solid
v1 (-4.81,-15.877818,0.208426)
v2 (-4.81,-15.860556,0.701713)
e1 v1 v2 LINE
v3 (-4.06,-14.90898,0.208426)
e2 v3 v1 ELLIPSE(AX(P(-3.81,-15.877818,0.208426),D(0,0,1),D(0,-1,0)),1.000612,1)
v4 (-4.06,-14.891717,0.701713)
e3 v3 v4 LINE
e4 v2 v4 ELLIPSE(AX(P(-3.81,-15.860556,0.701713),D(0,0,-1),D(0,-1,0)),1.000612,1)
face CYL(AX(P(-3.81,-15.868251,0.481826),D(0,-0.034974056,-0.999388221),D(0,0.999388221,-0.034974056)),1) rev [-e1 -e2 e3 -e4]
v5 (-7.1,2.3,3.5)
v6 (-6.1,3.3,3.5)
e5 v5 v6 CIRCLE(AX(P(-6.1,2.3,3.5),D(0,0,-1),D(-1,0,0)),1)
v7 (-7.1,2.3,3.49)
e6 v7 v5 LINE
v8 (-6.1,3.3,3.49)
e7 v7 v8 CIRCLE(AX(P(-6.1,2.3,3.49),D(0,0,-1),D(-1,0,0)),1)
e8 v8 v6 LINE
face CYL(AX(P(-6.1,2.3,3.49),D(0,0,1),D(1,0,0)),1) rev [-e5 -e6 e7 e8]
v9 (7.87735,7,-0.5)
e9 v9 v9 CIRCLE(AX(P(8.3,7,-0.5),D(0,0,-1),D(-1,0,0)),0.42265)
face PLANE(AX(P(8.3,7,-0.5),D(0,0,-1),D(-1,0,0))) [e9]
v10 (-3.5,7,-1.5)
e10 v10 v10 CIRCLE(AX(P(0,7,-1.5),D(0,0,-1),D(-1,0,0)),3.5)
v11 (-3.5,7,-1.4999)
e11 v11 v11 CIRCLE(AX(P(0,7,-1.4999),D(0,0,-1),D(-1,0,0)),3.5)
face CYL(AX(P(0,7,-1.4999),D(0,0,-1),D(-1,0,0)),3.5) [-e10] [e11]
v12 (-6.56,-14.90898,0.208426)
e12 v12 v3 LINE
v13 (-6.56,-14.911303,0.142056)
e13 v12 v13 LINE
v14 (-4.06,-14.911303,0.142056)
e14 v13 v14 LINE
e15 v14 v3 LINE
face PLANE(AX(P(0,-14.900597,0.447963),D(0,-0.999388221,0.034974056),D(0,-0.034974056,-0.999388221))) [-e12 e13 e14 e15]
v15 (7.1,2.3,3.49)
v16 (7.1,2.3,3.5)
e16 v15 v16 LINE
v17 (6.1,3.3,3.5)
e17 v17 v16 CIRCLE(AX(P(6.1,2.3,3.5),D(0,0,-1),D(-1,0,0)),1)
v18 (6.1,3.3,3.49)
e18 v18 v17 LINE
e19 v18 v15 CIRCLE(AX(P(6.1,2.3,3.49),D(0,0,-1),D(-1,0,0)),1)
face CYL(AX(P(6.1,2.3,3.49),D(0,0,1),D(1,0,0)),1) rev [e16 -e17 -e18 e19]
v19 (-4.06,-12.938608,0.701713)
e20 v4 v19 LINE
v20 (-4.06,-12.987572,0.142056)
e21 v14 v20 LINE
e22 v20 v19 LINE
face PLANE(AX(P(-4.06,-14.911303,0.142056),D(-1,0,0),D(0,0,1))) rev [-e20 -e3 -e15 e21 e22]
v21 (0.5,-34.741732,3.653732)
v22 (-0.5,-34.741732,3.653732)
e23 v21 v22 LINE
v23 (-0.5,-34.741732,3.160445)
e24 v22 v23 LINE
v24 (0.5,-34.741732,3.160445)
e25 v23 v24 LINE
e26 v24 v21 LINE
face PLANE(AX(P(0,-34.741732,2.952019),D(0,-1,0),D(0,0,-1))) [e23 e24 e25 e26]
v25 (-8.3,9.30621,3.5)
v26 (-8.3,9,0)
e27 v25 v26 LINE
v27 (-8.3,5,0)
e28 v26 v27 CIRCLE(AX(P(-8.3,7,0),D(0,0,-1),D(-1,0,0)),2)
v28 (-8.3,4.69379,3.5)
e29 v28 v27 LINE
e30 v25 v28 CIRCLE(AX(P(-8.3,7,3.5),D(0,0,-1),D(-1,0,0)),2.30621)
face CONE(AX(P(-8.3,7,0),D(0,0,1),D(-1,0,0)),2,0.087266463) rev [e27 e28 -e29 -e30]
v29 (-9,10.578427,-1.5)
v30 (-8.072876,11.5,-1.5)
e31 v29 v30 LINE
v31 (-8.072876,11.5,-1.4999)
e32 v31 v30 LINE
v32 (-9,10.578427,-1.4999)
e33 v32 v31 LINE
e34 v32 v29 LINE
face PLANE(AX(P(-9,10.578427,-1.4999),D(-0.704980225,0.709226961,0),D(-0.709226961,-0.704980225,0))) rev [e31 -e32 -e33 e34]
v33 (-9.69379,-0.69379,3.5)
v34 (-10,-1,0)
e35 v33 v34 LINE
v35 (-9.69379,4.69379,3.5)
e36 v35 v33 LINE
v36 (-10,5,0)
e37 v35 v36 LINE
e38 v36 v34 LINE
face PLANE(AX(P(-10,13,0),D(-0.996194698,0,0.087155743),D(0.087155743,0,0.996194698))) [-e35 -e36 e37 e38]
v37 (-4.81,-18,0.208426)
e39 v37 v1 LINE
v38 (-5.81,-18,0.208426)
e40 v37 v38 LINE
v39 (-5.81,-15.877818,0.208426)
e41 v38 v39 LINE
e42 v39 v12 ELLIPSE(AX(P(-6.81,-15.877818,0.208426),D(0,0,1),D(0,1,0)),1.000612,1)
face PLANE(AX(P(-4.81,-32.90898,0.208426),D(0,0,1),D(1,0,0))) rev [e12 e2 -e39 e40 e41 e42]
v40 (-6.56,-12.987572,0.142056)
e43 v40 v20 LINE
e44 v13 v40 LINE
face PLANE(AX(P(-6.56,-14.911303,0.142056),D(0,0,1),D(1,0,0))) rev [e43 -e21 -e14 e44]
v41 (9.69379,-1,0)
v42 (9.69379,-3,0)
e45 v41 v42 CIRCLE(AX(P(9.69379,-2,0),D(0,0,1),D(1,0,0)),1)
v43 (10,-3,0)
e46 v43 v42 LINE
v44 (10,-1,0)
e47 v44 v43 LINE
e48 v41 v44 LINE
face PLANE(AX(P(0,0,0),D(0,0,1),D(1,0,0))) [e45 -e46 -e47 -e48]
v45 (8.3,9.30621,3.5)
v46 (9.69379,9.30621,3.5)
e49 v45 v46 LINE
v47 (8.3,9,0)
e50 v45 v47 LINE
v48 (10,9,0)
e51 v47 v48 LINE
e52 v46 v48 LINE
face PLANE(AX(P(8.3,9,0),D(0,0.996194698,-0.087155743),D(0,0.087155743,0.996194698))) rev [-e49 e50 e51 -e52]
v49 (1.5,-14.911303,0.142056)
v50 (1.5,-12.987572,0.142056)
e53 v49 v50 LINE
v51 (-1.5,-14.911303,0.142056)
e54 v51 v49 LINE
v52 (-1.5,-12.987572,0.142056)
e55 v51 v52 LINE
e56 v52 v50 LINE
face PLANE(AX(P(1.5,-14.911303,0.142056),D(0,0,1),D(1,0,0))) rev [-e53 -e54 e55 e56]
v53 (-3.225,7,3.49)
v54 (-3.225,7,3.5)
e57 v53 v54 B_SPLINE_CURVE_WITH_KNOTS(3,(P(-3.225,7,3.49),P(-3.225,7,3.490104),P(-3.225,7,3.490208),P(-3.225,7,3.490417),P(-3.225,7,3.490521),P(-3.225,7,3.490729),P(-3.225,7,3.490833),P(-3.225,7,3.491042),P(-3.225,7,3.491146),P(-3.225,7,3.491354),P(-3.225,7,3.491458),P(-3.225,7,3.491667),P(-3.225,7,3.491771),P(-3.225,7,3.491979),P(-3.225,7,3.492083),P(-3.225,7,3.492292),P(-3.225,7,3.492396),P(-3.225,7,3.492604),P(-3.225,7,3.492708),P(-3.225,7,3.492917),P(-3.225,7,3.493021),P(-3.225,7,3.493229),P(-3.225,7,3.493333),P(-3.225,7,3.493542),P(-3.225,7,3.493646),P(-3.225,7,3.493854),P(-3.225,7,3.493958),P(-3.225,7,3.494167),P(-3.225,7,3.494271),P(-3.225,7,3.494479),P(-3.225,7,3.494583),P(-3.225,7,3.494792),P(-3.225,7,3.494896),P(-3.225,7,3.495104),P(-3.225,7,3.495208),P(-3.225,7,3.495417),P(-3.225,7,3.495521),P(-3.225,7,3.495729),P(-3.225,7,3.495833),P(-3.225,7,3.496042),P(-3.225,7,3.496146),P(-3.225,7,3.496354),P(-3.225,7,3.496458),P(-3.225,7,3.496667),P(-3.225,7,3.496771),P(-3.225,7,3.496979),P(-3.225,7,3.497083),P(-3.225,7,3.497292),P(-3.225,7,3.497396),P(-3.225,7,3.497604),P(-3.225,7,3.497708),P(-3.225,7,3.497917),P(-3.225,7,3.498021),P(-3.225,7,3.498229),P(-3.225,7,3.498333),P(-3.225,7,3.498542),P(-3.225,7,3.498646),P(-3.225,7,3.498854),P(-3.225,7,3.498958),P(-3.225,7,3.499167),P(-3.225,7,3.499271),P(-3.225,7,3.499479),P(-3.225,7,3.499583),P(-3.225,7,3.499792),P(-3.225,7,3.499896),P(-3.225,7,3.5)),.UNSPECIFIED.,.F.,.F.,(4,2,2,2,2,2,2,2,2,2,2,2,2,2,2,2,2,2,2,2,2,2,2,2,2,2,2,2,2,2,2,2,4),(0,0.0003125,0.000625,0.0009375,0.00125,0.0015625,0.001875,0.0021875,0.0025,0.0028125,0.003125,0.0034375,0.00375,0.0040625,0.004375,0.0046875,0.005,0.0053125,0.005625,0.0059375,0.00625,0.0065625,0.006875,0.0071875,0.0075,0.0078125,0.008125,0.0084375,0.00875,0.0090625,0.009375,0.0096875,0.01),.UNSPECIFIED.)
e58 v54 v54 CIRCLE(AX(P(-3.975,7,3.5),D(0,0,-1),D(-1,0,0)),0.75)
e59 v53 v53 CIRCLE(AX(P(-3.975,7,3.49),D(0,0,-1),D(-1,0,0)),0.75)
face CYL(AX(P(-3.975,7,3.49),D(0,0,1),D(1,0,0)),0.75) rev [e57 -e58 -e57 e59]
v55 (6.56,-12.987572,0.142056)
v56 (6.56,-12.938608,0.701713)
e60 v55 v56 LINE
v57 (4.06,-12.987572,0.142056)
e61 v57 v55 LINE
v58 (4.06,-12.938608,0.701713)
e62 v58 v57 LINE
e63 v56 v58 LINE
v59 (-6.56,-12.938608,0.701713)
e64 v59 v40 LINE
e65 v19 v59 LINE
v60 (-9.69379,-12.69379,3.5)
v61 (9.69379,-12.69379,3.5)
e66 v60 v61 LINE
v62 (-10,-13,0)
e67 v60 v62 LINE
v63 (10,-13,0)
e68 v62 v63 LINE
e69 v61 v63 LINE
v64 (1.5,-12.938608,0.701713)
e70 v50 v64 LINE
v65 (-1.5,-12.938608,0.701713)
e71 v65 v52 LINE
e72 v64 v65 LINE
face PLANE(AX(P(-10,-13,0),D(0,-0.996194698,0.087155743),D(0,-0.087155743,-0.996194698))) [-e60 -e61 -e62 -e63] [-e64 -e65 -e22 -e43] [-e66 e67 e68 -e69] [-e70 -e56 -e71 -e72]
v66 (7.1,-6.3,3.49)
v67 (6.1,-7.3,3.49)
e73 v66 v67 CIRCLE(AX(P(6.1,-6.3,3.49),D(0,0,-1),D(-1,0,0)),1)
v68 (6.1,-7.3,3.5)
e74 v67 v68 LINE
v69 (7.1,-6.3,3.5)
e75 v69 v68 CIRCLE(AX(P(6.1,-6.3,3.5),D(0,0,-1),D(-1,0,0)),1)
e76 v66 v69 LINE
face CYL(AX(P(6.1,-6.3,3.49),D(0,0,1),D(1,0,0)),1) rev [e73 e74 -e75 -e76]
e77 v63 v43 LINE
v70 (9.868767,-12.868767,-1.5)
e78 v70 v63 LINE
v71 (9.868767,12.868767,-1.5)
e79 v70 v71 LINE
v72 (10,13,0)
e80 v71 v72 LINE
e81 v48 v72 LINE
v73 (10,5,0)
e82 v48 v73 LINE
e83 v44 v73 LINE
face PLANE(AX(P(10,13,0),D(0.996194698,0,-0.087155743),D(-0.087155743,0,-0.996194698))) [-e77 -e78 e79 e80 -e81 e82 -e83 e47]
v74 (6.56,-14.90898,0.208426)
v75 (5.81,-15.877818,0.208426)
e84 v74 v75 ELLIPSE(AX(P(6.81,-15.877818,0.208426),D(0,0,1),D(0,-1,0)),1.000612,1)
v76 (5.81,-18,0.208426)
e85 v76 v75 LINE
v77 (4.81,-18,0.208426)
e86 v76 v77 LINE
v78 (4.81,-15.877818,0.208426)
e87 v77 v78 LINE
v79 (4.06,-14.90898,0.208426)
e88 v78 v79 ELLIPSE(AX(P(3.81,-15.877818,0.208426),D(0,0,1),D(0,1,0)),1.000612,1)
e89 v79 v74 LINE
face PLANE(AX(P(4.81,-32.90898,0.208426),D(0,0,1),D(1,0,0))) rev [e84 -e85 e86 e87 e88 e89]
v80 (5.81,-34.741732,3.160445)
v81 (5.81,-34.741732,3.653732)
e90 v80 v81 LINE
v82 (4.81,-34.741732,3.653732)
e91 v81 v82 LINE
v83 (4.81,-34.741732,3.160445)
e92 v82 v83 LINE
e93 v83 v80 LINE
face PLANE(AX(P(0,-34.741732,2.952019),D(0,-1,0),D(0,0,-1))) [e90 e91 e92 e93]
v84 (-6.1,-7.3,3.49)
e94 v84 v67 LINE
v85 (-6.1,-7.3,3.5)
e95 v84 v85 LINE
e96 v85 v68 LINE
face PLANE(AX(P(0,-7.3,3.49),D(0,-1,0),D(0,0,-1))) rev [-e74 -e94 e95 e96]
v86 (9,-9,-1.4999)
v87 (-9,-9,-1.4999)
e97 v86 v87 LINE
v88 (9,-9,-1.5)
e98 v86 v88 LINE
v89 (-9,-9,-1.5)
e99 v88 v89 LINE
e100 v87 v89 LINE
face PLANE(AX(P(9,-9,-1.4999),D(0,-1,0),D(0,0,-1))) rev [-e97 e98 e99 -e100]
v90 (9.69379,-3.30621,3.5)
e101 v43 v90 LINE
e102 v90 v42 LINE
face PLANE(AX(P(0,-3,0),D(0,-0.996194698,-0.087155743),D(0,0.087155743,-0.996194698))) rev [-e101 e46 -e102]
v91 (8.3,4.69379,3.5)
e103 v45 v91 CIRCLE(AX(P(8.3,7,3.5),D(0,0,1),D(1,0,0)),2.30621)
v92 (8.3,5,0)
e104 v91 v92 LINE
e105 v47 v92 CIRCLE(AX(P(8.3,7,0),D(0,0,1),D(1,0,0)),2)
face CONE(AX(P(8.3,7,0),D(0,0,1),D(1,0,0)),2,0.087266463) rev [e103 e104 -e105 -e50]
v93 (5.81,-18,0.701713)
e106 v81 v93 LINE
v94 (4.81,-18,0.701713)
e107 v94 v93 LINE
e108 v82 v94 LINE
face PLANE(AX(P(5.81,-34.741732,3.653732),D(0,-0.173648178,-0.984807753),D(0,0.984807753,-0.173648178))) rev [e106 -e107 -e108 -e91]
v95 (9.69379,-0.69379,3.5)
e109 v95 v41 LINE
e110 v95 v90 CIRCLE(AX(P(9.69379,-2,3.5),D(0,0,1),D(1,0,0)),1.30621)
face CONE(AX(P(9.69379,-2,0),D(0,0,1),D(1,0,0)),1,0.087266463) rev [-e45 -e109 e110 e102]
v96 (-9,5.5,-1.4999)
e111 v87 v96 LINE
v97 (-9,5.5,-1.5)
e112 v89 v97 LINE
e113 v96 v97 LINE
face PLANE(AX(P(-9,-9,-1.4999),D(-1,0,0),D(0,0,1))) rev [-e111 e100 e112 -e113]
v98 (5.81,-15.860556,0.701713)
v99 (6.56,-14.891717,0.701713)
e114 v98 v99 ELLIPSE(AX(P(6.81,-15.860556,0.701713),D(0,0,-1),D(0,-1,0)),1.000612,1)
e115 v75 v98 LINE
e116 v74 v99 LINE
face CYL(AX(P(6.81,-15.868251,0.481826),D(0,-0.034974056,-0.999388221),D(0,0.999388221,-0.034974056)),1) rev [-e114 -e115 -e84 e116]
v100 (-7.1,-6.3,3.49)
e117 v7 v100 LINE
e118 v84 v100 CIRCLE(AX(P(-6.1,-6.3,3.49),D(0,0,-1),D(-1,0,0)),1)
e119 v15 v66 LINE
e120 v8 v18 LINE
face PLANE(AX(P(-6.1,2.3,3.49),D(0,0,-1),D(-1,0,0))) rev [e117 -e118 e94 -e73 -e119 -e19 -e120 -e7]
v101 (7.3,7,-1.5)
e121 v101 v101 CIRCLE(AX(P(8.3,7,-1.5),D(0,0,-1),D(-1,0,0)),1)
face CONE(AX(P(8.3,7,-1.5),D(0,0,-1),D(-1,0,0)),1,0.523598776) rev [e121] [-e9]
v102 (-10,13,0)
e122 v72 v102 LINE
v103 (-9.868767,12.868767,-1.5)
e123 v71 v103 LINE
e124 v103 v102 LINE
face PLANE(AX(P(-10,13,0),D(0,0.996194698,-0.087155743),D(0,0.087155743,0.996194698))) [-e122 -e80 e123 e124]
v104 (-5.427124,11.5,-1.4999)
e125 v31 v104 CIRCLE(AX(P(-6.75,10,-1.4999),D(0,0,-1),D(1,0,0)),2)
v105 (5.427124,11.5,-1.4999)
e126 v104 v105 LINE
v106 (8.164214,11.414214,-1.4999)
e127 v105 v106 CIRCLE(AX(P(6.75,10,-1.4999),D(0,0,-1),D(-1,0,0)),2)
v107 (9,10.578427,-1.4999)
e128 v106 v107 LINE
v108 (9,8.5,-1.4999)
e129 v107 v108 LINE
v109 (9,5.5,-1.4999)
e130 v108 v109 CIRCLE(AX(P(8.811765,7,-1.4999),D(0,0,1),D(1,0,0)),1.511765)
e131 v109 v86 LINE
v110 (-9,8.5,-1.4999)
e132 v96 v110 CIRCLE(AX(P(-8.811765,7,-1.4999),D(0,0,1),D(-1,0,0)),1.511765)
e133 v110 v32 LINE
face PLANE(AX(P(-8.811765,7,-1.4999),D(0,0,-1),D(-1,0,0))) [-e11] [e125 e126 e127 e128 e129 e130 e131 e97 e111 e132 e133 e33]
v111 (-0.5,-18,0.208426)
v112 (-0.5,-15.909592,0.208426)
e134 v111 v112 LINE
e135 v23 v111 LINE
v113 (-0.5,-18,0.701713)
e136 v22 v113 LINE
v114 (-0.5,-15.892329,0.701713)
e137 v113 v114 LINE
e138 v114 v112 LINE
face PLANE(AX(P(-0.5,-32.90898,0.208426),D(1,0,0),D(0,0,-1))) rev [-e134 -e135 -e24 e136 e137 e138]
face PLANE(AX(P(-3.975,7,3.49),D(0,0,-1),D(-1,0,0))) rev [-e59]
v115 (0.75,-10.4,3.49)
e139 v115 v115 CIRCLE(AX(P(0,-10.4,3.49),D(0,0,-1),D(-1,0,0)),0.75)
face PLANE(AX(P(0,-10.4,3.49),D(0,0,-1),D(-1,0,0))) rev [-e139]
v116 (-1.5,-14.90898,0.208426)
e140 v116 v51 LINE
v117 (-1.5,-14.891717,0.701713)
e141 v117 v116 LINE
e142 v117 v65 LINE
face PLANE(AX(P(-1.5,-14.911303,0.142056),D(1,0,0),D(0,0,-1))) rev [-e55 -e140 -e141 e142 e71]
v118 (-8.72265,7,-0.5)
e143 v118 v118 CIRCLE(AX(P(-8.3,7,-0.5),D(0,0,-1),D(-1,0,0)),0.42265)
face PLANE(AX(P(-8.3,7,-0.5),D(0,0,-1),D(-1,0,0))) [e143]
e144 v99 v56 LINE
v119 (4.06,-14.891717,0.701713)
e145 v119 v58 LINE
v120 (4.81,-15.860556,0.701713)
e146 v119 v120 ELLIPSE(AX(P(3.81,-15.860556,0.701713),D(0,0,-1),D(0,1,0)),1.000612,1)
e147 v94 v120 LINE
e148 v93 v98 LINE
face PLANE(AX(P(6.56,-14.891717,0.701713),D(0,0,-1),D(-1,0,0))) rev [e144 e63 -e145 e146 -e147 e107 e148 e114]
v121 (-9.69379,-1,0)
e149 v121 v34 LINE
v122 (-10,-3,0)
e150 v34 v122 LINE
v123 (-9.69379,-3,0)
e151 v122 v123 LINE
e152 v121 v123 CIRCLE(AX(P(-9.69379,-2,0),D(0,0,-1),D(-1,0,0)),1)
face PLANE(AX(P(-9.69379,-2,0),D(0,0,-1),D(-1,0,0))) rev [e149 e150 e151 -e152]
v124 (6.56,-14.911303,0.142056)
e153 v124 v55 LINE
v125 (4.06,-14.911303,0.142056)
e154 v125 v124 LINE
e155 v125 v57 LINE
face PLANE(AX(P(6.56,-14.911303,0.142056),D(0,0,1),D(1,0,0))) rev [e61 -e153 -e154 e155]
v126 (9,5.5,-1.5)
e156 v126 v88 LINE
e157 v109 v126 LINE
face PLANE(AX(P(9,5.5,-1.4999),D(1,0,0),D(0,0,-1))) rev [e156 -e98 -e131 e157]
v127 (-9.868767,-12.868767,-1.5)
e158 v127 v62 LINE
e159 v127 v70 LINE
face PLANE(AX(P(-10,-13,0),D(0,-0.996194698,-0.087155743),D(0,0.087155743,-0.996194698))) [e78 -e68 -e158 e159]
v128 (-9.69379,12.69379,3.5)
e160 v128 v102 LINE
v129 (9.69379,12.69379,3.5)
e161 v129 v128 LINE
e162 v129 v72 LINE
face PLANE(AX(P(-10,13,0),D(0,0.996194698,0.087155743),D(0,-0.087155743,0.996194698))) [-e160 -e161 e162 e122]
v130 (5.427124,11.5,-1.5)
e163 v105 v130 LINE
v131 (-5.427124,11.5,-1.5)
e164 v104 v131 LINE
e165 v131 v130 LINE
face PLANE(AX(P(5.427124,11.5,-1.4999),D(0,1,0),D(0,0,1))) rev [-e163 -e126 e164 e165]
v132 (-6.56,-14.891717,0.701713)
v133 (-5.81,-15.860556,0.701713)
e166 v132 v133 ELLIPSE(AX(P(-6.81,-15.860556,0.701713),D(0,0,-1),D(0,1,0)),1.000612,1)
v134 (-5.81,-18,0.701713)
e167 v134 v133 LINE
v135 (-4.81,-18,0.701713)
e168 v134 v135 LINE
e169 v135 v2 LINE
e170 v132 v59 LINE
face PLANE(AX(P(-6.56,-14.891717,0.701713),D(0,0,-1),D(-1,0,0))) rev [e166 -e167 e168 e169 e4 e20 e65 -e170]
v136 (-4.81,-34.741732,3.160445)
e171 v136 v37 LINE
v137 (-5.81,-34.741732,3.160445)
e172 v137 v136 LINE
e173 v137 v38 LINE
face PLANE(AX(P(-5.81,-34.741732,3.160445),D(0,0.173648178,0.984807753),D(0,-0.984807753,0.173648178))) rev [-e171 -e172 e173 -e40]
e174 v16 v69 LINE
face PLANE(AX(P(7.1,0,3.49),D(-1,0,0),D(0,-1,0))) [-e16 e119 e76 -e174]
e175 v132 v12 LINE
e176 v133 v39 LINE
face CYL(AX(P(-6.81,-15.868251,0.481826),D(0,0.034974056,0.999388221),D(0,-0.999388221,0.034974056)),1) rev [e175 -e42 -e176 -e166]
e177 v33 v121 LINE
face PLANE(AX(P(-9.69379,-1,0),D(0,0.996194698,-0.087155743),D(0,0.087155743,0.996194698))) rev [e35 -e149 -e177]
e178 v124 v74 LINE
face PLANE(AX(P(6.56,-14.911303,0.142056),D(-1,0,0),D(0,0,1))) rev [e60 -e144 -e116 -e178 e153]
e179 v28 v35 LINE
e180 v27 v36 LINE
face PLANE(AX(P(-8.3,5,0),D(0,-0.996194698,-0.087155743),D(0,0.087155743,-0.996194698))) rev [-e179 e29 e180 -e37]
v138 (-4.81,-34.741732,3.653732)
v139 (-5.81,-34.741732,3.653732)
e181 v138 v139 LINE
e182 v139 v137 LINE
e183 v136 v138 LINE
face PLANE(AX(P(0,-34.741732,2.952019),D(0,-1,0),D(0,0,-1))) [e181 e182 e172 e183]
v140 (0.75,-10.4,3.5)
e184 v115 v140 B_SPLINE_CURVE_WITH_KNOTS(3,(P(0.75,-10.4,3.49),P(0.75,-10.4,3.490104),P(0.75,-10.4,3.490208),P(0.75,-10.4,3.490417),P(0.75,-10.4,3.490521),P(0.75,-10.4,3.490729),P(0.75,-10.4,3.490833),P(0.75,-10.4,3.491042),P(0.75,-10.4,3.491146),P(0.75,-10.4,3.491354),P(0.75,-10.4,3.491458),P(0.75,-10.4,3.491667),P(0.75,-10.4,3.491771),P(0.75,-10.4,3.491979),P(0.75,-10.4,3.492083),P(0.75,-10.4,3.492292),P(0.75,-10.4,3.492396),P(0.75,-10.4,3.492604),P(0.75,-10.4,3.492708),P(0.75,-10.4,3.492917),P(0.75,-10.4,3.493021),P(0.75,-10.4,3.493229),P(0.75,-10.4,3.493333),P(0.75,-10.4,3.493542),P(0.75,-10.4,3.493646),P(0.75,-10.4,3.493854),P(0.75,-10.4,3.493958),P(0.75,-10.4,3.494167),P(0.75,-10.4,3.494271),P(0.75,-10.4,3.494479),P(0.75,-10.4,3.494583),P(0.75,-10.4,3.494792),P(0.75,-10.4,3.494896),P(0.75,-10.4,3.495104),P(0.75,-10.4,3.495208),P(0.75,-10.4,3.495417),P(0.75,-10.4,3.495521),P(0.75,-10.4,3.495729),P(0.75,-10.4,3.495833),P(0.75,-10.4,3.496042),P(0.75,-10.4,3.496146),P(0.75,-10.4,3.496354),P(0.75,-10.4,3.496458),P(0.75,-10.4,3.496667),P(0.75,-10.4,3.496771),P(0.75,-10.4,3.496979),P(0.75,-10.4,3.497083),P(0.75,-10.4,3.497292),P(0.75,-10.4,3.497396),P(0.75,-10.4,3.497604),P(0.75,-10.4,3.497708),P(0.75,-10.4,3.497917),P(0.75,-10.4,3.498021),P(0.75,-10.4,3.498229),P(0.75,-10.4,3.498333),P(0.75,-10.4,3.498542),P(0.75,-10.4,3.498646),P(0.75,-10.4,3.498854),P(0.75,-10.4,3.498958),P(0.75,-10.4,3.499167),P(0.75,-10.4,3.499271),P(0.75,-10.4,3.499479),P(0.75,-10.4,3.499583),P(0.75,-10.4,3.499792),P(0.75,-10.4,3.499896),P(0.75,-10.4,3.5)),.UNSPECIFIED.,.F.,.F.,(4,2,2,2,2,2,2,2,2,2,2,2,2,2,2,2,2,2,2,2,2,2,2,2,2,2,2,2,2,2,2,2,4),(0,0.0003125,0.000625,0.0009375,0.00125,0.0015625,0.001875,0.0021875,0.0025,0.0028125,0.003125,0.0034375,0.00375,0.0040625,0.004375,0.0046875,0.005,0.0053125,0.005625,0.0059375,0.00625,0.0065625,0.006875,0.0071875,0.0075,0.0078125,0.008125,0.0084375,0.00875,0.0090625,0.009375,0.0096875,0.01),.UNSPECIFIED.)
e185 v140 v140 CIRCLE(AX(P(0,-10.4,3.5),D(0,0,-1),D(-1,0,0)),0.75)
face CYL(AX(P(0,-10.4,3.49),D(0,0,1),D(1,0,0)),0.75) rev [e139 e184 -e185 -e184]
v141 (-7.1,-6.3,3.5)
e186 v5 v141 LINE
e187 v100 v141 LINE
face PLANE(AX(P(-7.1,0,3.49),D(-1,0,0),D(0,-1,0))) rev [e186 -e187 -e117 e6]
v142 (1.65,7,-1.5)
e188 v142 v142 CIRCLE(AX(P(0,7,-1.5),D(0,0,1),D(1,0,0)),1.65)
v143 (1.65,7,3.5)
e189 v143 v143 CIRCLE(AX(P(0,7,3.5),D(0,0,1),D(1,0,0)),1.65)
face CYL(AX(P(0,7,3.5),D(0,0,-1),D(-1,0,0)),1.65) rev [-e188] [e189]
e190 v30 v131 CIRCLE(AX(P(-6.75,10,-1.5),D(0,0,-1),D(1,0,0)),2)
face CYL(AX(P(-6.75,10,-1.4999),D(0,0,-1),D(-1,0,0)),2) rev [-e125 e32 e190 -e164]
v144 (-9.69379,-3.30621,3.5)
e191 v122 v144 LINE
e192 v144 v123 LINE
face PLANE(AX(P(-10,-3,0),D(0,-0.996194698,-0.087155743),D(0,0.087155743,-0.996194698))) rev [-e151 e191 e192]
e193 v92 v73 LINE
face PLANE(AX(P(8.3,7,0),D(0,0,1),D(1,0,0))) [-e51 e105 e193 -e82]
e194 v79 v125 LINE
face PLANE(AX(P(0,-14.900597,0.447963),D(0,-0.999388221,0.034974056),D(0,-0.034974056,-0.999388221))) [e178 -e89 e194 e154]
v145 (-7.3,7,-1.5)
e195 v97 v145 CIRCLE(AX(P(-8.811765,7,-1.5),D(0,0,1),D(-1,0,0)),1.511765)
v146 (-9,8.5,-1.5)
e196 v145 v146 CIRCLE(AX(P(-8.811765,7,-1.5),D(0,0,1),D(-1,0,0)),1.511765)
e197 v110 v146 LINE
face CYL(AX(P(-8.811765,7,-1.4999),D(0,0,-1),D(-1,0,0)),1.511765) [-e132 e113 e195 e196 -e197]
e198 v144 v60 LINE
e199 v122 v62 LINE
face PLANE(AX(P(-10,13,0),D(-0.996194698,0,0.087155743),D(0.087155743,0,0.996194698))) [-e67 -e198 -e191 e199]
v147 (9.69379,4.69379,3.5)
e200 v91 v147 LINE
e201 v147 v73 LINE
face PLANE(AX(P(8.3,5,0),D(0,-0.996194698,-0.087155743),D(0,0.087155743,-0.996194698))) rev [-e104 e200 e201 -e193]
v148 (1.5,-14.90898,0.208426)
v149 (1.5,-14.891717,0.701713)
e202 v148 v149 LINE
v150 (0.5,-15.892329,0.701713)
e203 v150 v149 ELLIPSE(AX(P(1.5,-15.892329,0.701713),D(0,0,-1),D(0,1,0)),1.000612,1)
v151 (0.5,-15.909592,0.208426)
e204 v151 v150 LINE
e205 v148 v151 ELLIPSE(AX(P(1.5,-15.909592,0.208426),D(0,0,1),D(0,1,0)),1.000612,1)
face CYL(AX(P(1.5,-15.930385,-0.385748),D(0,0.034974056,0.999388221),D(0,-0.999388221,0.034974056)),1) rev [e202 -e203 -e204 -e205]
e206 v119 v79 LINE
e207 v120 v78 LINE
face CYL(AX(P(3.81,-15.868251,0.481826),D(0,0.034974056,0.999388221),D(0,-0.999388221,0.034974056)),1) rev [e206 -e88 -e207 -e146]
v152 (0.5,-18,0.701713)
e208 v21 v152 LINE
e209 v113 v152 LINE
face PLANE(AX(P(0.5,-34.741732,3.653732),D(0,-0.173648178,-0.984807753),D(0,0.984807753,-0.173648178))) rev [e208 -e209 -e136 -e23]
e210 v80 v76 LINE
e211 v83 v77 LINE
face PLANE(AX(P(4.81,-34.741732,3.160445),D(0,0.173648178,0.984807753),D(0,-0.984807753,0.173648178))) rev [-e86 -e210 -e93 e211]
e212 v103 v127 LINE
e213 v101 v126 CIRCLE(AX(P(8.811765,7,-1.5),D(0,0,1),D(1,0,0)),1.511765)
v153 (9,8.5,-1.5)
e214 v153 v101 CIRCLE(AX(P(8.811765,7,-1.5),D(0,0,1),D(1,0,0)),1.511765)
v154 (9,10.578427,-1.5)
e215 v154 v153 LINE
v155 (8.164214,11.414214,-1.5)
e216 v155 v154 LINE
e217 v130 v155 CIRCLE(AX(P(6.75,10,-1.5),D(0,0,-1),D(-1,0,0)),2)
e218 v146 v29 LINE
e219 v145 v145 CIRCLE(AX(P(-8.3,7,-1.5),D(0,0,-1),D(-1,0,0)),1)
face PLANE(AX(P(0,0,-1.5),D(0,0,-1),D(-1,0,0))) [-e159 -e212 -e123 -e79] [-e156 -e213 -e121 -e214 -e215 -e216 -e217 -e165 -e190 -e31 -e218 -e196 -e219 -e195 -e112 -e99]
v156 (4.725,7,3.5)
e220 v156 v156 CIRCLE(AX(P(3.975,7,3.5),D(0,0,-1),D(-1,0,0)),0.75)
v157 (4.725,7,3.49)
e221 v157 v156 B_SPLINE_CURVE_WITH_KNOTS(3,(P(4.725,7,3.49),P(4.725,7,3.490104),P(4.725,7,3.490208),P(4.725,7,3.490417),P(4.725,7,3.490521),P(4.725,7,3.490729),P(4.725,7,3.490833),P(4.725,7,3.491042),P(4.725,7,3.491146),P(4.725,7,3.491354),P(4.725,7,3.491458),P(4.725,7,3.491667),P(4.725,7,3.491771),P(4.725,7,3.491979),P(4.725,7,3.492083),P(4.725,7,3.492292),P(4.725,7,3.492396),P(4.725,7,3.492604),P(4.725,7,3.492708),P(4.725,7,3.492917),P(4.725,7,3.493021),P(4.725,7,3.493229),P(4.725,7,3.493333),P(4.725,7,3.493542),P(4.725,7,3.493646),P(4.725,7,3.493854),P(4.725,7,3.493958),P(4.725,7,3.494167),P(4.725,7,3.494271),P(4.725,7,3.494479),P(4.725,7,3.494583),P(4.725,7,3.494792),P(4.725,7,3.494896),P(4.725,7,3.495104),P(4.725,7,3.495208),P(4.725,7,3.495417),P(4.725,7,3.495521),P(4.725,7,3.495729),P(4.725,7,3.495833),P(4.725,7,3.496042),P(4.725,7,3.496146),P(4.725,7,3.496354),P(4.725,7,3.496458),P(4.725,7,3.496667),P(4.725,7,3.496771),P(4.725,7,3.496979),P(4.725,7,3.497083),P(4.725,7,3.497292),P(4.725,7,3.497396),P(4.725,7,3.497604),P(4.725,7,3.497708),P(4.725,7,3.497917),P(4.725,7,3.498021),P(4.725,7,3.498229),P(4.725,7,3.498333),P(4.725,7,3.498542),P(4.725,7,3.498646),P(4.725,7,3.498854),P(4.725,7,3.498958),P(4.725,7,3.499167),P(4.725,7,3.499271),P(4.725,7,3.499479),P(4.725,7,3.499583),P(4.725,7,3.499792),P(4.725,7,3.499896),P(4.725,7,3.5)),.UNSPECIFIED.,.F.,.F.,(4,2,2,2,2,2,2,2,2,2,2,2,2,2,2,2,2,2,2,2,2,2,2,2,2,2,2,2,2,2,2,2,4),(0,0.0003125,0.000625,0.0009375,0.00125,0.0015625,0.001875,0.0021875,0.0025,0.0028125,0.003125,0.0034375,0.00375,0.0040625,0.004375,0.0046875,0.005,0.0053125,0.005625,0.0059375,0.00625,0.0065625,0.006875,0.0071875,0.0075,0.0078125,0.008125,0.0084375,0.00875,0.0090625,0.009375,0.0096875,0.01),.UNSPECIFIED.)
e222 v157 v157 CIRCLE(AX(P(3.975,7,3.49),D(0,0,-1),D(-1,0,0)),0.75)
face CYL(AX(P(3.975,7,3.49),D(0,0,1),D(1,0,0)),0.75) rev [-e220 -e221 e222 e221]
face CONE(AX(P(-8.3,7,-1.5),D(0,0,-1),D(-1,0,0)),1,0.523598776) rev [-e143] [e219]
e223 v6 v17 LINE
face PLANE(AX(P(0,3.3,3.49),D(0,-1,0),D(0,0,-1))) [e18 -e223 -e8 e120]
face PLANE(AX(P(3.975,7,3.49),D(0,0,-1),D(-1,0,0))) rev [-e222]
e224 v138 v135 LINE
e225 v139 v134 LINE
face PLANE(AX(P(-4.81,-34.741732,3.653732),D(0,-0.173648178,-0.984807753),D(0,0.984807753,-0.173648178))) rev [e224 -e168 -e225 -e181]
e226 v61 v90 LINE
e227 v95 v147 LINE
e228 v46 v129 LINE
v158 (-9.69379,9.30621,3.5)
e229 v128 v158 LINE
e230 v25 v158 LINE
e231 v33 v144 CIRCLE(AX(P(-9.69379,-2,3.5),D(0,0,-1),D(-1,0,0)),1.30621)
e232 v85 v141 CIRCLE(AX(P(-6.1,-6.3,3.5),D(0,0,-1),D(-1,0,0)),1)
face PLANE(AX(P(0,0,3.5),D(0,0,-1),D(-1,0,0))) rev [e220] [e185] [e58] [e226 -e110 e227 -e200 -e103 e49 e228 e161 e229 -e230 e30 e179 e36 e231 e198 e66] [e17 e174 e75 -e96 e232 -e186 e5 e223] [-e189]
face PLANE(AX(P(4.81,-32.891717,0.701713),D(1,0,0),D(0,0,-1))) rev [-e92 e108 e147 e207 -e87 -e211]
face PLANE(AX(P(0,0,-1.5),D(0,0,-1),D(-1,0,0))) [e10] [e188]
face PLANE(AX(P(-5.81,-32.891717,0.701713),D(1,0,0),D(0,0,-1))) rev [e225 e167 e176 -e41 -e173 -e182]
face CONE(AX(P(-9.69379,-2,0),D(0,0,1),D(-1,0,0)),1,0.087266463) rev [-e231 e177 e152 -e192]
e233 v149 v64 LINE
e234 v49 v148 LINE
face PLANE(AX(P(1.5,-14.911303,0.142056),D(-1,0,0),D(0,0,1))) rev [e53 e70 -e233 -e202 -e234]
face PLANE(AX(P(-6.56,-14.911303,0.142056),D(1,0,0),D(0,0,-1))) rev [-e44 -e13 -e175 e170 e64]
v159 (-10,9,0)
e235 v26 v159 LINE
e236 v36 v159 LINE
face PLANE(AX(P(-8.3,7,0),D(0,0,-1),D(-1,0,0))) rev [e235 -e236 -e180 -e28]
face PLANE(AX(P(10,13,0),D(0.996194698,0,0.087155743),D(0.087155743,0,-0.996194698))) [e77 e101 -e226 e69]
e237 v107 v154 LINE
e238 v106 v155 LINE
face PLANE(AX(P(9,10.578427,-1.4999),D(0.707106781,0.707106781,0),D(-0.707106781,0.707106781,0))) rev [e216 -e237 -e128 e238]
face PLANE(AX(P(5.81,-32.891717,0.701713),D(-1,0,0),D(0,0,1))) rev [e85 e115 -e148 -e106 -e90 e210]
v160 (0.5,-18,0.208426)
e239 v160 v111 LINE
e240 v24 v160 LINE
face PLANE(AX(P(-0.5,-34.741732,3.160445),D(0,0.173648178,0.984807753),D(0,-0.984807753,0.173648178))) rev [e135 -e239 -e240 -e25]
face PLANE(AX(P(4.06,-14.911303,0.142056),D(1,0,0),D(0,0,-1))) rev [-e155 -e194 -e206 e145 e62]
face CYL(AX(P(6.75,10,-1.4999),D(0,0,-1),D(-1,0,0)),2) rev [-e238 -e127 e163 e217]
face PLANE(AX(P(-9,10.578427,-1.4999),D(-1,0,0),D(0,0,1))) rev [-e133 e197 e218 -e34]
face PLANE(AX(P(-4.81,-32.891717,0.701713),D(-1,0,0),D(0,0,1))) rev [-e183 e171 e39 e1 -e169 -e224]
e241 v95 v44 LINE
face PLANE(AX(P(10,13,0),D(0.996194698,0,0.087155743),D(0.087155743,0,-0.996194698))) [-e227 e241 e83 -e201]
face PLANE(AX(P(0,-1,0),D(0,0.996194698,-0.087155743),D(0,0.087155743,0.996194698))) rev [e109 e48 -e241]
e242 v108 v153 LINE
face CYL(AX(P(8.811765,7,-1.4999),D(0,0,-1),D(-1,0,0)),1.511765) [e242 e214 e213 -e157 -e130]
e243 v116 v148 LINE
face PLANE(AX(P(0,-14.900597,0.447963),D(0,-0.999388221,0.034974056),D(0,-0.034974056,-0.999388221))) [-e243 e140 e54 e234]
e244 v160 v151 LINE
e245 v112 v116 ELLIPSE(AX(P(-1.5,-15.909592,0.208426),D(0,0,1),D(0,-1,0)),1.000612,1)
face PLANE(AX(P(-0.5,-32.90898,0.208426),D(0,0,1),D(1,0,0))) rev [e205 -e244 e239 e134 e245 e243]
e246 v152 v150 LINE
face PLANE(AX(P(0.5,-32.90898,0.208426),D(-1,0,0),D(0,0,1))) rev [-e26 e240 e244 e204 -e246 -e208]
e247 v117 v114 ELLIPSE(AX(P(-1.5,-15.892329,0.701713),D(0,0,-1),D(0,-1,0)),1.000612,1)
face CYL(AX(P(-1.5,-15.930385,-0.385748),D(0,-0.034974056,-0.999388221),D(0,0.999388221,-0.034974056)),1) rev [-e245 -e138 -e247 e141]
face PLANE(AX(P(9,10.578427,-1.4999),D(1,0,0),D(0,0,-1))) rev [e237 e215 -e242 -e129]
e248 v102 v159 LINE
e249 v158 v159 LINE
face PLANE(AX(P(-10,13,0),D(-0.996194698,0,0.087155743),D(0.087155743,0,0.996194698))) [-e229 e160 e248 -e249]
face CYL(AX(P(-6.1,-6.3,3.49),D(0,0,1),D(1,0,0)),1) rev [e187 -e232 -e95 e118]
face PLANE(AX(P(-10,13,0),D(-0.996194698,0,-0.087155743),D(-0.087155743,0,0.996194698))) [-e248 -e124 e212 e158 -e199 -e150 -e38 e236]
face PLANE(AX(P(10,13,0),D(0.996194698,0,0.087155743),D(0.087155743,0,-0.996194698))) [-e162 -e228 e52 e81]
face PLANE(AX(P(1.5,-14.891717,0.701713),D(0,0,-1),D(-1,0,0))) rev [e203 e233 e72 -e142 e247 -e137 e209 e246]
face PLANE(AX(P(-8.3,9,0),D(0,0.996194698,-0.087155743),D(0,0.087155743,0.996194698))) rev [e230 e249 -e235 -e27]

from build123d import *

# Parameters (mm, degrees)
SKETCH1_W                    = 20
SKETCH1_H                    = 26
BOSS_EXTRUDE1_DEPTH          = 1.5
BOSS_EXTRUDE1_DRAFT          = -5
SKETCH1_2_W                  = 20
SKETCH1_2_H                  = 26
BOSS_EXTRUDE2_DEPTH          = 3.5
BOSS_EXTRUDE2_TAPER          = 5
CUT_EXTRUDE1_DEPTH           = 3.5
CUT_EXTRUDE1_TAPER           = -5
CUT_EXTRUDE1_2_DEPTH         = 3.5
CUT_EXTRUDE1_2_TAPER         = -5
CUT_EXTRUDE1_3_DEPTH         = 3.5
CUT_EXTRUDE1_3_TAPER         = -5
CUT_EXTRUDE1_4_DEPTH         = 3.5
CUT_EXTRUDE1_4_TAPER         = -5
CUT_EXTRUDE3_DEPTH           = 17.770509989
CUT_EXTRUDE3_DEPTH_BACK      = 17.770509989
SKETCH5_5_R                  = 1.65
CUT_EXTRUDE4_START           = 3.5
SKETCH5_8_R                  = 0.75
CUT_EXTRUDE4_DEPTH           = 0.01
CUT_EXTRUDE5_START           = -1.5
SKETCH5_9_R                  = 1
CUT_EXTRUDE5_DEPTH           = 1
CUT_EXTRUDE5_DRAFT           = 30
CUT_EXTRUDE5_PROFILE_2_DEPTH = 1
CUT_EXTRUDE5_PROFILE_2_DRAFT = 30
SKETCH6_R                    = 3.5
CUT_EXTRUDE6_DEPTH           = 0.0001
SKETCH7_W                    = 3
SKETCH7_H                    = 0.56
SKETCH7_W_2                  = 2.5
BOSS_EXTRUDE3_DEPTH          = 2.1
SKETCH8_W                    = 1
SKETCH8_H                    = 0.493588666
BOSS_EXTRUDE4_DEPTH          = 18
FILLET1_R                    = 1
CUT_EXTRUDE7_DEPTH           = 35.508424571
CUT_EXTRUDE7_DEPTH_BACK      = 35.508424571
SKETCH9_W                    = 11.62
SKETCH9_H                    = 15
SKETCH12_W                   = 1
SKETCH12_H                   = 0.493286698
BOSS_EXTRUDE5_DEPTH          = 17


# Read off the part's stored shape, not the designer's step: Cut-Extrude1
with BuildPart() as part:
    # Sketch1 → Boss-Extrude1 (with draft: the straight prism first)
    with BuildSketch(Plane.XY):
        Rectangle(SKETCH1_W, SKETCH1_H)
    extrude(amount=-BOSS_EXTRUDE1_DEPTH)
    # Boss-Extrude1: the draft: its side faces are tilted about the plane it starts from
    boss_extrude1_sides = [part.faces().sort_by_distance(p)[0] for p in [
        (-10, 0, -0.75),
        (0, -13, -0.75),
        (10, 0, -0.75),
        (0, 13, -0.75),
    ]]
    draft(boss_extrude1_sides, Plane.XY, BOSS_EXTRUDE1_DRAFT)

    # Sketch1<2> → Boss-Extrude2 (add)
    with BuildSketch(Plane.XY):
        Rectangle(SKETCH1_2_W, SKETCH1_2_H)
    extrude(amount=BOSS_EXTRUDE2_DEPTH, taper=BOSS_EXTRUDE2_TAPER)

    # Cut-Extrude1 outline → Cut-Extrude1 (cut)
    with BuildSketch(Plane.XY):
        with BuildLine():
            Line((10, -1), (9.693789678, -1))
            ThreePointArc((9.693789678, -1), (8.693789678, -2), (9.693789678, -3))
            Line((9.693789678, -3), (10, -3))
            Line((10, -3), (10, -1))
        make_face()
    extrude(amount=CUT_EXTRUDE1_DEPTH, taper=CUT_EXTRUDE1_TAPER, mode=Mode.SUBTRACT)

    # Cut-Extrude1 2 outline → Cut-Extrude1 2 (cut)
    with BuildSketch(Plane.XY):
        with BuildLine():
            Line((-9.693789678, -1), (-10, -1))
            Line((-10, -1), (-10, -3))
            Line((-10, -3), (-9.693789678, -3))
            ThreePointArc((-9.693789678, -3), (-8.693789678, -2), (-9.693789678, -1))
        make_face()
    extrude(amount=CUT_EXTRUDE1_2_DEPTH, taper=CUT_EXTRUDE1_2_TAPER, mode=Mode.SUBTRACT)

    # Cut-Extrude1 3 outline → Cut-Extrude1 3 (cut)
    with BuildSketch(Plane.XY):
        with BuildLine():
            Line((-8.3, 9), (-10, 9))
            Line((-10, 9), (-10, 5))
            Line((-10, 5), (-8.3, 5))
            ThreePointArc((-8.3, 5), (-6.3, 7), (-8.3, 9))
        make_face()
    extrude(amount=CUT_EXTRUDE1_3_DEPTH, taper=CUT_EXTRUDE1_3_TAPER, mode=Mode.SUBTRACT)

    # Cut-Extrude1 4 outline → Cut-Extrude1 4 (cut)
    with BuildSketch(Plane.XY):
        with BuildLine():
            Line((10, 9), (8.3, 9))
            ThreePointArc((8.3, 9), (6.3, 7), (8.3, 5))
            Line((8.3, 5), (10, 5))
            Line((10, 5), (10, 9))
        make_face()
    extrude(amount=CUT_EXTRUDE1_4_DEPTH, taper=CUT_EXTRUDE1_4_TAPER, mode=Mode.SUBTRACT)

    # Sketch5<5> → Cut-Extrude3 (cut, two sides: drawn at the far end of the back side and taken through both)
    with BuildSketch(Plane.XY.offset(-CUT_EXTRUDE3_DEPTH_BACK)):
        with Locations((0, 7)):
            Circle(SKETCH5_5_R)
    extrude(amount=CUT_EXTRUDE3_DEPTH + CUT_EXTRUDE3_DEPTH_BACK, mode=Mode.SUBTRACT)

    # Sketch5<8> → Cut-Extrude4 (cut)
    with BuildSketch(Plane.XY.offset(CUT_EXTRUDE4_START)):
        with Locations((3.975, 7)):
            Circle(SKETCH5_8_R)
        with Locations((-3.975, 7)):
            Circle(SKETCH5_8_R)
        with Locations((0, -10.4)):
            Circle(SKETCH5_8_R)
        with BuildLine():
            Line((-6.1, 3.3), (6.1, 3.3))
            ThreePointArc((6.1, 3.3), (6.807106781, 3.007106781), (7.1, 2.3))
            Line((7.1, 2.3), (7.1, -6.3))
            ThreePointArc((7.1, -6.3), (6.807106781, -7.007106781), (6.1, -7.3))
            Line((6.1, -7.3), (-6.1, -7.3))
            ThreePointArc((-6.1, -7.3), (-6.807106781, -7.007106781), (-7.1, -6.3))
            Line((-7.1, -6.3), (-7.1, 2.3))
            ThreePointArc((-7.1, 2.3), (-6.807106781, 3.007106781), (-6.1, 3.3))
        make_face()
    extrude(amount=-CUT_EXTRUDE4_DEPTH, mode=Mode.SUBTRACT)


with BuildPart() as cut_extrude5_tool:
    # Sketch5<9> → Cut-Extrude5 (with draft: the straight prism first)
    with BuildSketch(Plane.XY.offset(CUT_EXTRUDE5_START)):
        with Locations((8.3, 7)):
            Circle(SKETCH5_9_R)
    extrude(amount=CUT_EXTRUDE5_DEPTH)
    # Cut-Extrude5: the draft: its side faces are tilted about the plane it starts from
    cut_extrude5_sides = [cut_extrude5_tool.faces().sort_by_distance(p)[0] for p in [
        (7.3, 7, -1),
    ]]
    draft(cut_extrude5_sides, Plane.XY.offset(CUT_EXTRUDE5_START), CUT_EXTRUDE5_DRAFT)


with BuildPart() as part_1:
    add(part.part)

    # Cut-Extrude5: cut by cut_extrude5_tool
    add(cut_extrude5_tool.part, mode=Mode.SUBTRACT)


with BuildPart() as cut_extrude5_profile_2_tool:
    # Sketch5<9> → Cut-Extrude5 profile 2 (with draft: the straight prism first)
    with BuildSketch(Plane.XY.offset(CUT_EXTRUDE5_START)):
        with Locations((-8.3, 7)):
            Circle(SKETCH5_9_R)
    extrude(amount=CUT_EXTRUDE5_PROFILE_2_DEPTH)
    # Cut-Extrude5 profile 2: the draft: its side faces are tilted about the plane it starts from
    cut_extrude5_profile_2_sides = [cut_extrude5_profile_2_tool.faces().sort_by_distance(p)[0] for p in [
        (-9.3, 7, -1),
    ]]
    draft(cut_extrude5_profile_2_sides, Plane.XY.offset(CUT_EXTRUDE5_START), CUT_EXTRUDE5_PROFILE_2_DRAFT)


with BuildPart() as part_2:
    add(part_1.part)

    # Cut-Extrude5 profile 2: cut by cut_extrude5_profile_2_tool
    add(cut_extrude5_profile_2_tool.part, mode=Mode.SUBTRACT)

    # Sketch6 → Cut-Extrude6 (cut)
    with BuildSketch(Plane(origin=(0, 0, -1.5), x_dir=(-1, 0, 0), z_dir=(0, 0, -1))):
        with BuildLine():
            Line((-5.427124344, 11.5), (5.427124344, 11.5))
            ThreePointArc((5.427124344, 11.5), (6.75, 12), (8.072875656, 11.5))
            Line((8.072875656, 11.5), (9, 10.578427125))
            Line((9, 10.578427125), (9, 8.5))
            ThreePointArc((9, 8.5), (7.3, 7), (9, 5.5))
            Line((9, 5.5), (9, -9))
            Line((9, -9), (-9, -9))
            Line((-9, -9), (-9, 5.5))
            ThreePointArc((-9, 5.5), (-7.3, 7), (-9, 8.5))
            Line((-9, 8.5), (-9, 10.578427125))
            Line((-9, 10.578427125), (-8.164213562, 11.414213562))
            ThreePointArc((-8.164213562, 11.414213562), (-6.812653663, 11.999018389), (-5.427124344, 11.5))
        make_face()
        with Locations((0, 7)):
            Circle(SKETCH6_R, mode=Mode.SUBTRACT)
    extrude(amount=-CUT_EXTRUDE6_DEPTH, mode=Mode.SUBTRACT)

    # Sketch7 → Boss-Extrude3 (add, along a direction that is not the sketch's normal)
    with BuildSketch(Plane(origin=(0, -12.800597138, 0.447962854), x_dir=(-1, 0, 0), z_dir=(0, -0.9993882205697596, 0.034974055904479696))):
        with Locations((0, 0.026094538)):
            Rectangle(SKETCH7_W, SKETCH7_H)
        with Locations((-5.31, 0.026094538)):
            Rectangle(SKETCH7_W_2, SKETCH7_H)
        with Locations((5.31, 0.026094538)):
            Rectangle(SKETCH7_W_2, SKETCH7_H)
    extrude(amount=BOSS_EXTRUDE3_DEPTH, dir=(0, -1, 0))

    # Sketch8 → Boss-Extrude4 (add, along a direction that is not the sketch's normal)
    with BuildSketch(Plane(origin=(0, -14.89802845, 0.521363439), x_dir=(1, 0, 0), z_dir=(0, -0.9993882205697596, 0.03497405590447946))):
        with Locations((5.31, -0.066334388)):
            Rectangle(SKETCH8_W, SKETCH8_H)
        with Locations((0, -0.066334388)):
            Rectangle(SKETCH8_W, SKETCH8_H)
        with Locations((-5.31, -0.066334388)):
            Rectangle(SKETCH8_W, SKETCH8_H)
    extrude(amount=BOSS_EXTRUDE4_DEPTH, dir=(0, -1, 0))

    # Fillet1
    # the kernel refuses this fillet: 1 mm, written as the material it adds along each edge
    with BuildSketch(Plane(origin=(4.81, -14.993638542, -2.210707425), x_dir=(-1, 0, 0), z_dir=(0, 0.03497405590447946, 0.9993882205697596))) as fillet1_piece_1_section:
        with BuildLine():
            CenterArc((1, 0.968245837), FILLET1_R, 180, 75.522487814)
            Line((0, 0.968245837), (-0.02, 0.968245837))
            Line((-0.02, 0.968245837), (-0.02, 0))
            Line((-0.02, 0), (0, -0.02))
            ThreePointArc((0, -0.02), (0.375, -0.02), (0.745, -0.019364917))
            Line((0.745, -0.019364917), (0.75, 0))
        make_face()
    fillet1_piece_1 = extrude(amount=5.334817848, mode=Mode.PRIVATE)
    fillet1_piece_1 = split(fillet1_piece_1, bisect_by=Plane(origin=(4.620408244, -15.128632193, 0.701712982), z_dir=(0, 0, -1)), keep=Keep.TOP, mode=Mode.PRIVATE)
    fillet1_piece_1 = split(fillet1_piece_1, bisect_by=Plane(origin=(4.620408244, -15.128632193, 0.208426284), z_dir=(0, 0, 1)), keep=Keep.TOP, mode=Mode.PRIVATE)
    add(fillet1_piece_1)
    with BuildSketch(Plane(origin=(5.81, -14.807058324, 3.120846692), x_dir=(1, 0, 0), z_dir=(0, -0.03497405590447946, -0.9993882205697596))) as fillet1_piece_2_section:
        with BuildLine():
            CenterArc((1, 0.968245837), FILLET1_R, 180, 75.522487814)
            Line((0, 0.968245837), (-0.02, 0.968245837))
            Line((-0.02, 0.968245837), (-0.02, 0))
            Line((-0.02, 0), (0, -0.02))
            ThreePointArc((0, -0.02), (0.375, -0.02), (0.745, -0.019364917))
            Line((0.745, -0.019364917), (0.75, 0))
        make_face()
    fillet1_piece_2 = extrude(amount=5.334817848, mode=Mode.PRIVATE)
    fillet1_piece_2 = split(fillet1_piece_2, bisect_by=Plane(origin=(5.999591756, -15.128632193, 0.701712982), z_dir=(0, 0, -1)), keep=Keep.TOP, mode=Mode.PRIVATE)
    fillet1_piece_2 = split(fillet1_piece_2, bisect_by=Plane(origin=(5.999591756, -15.128632193, 0.208426284), z_dir=(0, 0, 1)), keep=Keep.TOP, mode=Mode.PRIVATE)
    add(fillet1_piece_2)
    with BuildSketch(Plane(origin=(0.5, -14.996414972, -2.290044267), x_dir=(1, 0, 0), z_dir=(0, 0.03497405590447946, 0.9993882205697596))) as fillet1_piece_3_section:
        with BuildLine():
            CenterArc((FILLET1_R, -FILLET1_R), FILLET1_R, 90, 90)
            Line((0, -FILLET1_R), (-FILLET1_R * 0.02, -FILLET1_R))
            Line((-FILLET1_R * 0.02, -FILLET1_R), (-FILLET1_R * 0.02, FILLET1_R * 0.02))
            Line((-FILLET1_R * 0.02, FILLET1_R * 0.02), (FILLET1_R, FILLET1_R * 0.02))
            Line((FILLET1_R, FILLET1_R * 0.02), (FILLET1_R, 0))
        make_face()
    fillet1_piece_3 = extrude(amount=5.493588666, mode=Mode.PRIVATE)
    fillet1_piece_3 = split(fillet1_piece_3, bisect_by=Plane(origin=(0.726395114, -15.126882136, 0.701712982), z_dir=(0, 0, -1)), keep=Keep.TOP, mode=Mode.PRIVATE)
    fillet1_piece_3 = split(fillet1_piece_3, bisect_by=Plane(origin=(0.726395114, -15.126882136, 0.208426284), z_dir=(0, 0, 1)), keep=Keep.TOP, mode=Mode.PRIVATE)
    add(fillet1_piece_3)
    with BuildSketch(Plane(origin=(-0.5, -14.804281894, 3.200183534), x_dir=(-1, 0, 0), z_dir=(0, -0.03497405590447946, -0.9993882205697596))) as fillet1_piece_4_section:
        with BuildLine():
            CenterArc((FILLET1_R, -FILLET1_R), FILLET1_R, 90, 90)
            Line((0, -FILLET1_R), (-FILLET1_R * 0.02, -FILLET1_R))
            Line((-FILLET1_R * 0.02, -FILLET1_R), (-FILLET1_R * 0.02, FILLET1_R * 0.02))
            Line((-FILLET1_R * 0.02, FILLET1_R * 0.02), (FILLET1_R, FILLET1_R * 0.02))
            Line((FILLET1_R, FILLET1_R * 0.02), (FILLET1_R, 0))
        make_face()
    fillet1_piece_4 = extrude(amount=5.493588666, mode=Mode.PRIVATE)
    fillet1_piece_4 = split(fillet1_piece_4, bisect_by=Plane(origin=(-0.726395114, -15.126882136, 0.701712982), z_dir=(0, 0, -1)), keep=Keep.TOP, mode=Mode.PRIVATE)
    fillet1_piece_4 = split(fillet1_piece_4, bisect_by=Plane(origin=(-0.726395114, -15.126882136, 0.208426284), z_dir=(0, 0, 1)), keep=Keep.TOP, mode=Mode.PRIVATE)
    add(fillet1_piece_4)
    with BuildSketch(Plane(origin=(-5.81, -14.993638542, -2.210707425), x_dir=(-1, 0, 0), z_dir=(0, 0.03497405590447946, 0.9993882205697596))) as fillet1_piece_5_section:
        with BuildLine():
            CenterArc((1, 0.968245837), FILLET1_R, 180, 75.522487814)
            Line((0, 0.968245837), (-0.02, 0.968245837))
            Line((-0.02, 0.968245837), (-0.02, 0))
            Line((-0.02, 0), (0, -0.02))
            ThreePointArc((0, -0.02), (0.375, -0.02), (0.745, -0.019364917))
            Line((0.745, -0.019364917), (0.75, 0))
        make_face()
    fillet1_piece_5 = extrude(amount=5.334817848, mode=Mode.PRIVATE)
    fillet1_piece_5 = split(fillet1_piece_5, bisect_by=Plane(origin=(-5.999591756, -15.128632193, 0.701712982), z_dir=(0, 0, -1)), keep=Keep.TOP, mode=Mode.PRIVATE)
    fillet1_piece_5 = split(fillet1_piece_5, bisect_by=Plane(origin=(-5.999591756, -15.128632193, 0.208426284), z_dir=(0, 0, 1)), keep=Keep.TOP, mode=Mode.PRIVATE)
    add(fillet1_piece_5)
    with BuildSketch(Plane(origin=(-4.81, -14.807058324, 3.120846692), x_dir=(1, 0, 0), z_dir=(0, -0.03497405590447946, -0.9993882205697596))) as fillet1_piece_6_section:
        with BuildLine():
            CenterArc((1, 0.968245837), FILLET1_R, 180, 75.522487814)
            Line((0, 0.968245837), (-0.02, 0.968245837))
            Line((-0.02, 0.968245837), (-0.02, 0))
            Line((-0.02, 0), (0, -0.02))
            ThreePointArc((0, -0.02), (0.375, -0.02), (0.745, -0.019364917))
            Line((0.745, -0.019364917), (0.75, 0))
        make_face()
    fillet1_piece_6 = extrude(amount=5.334817848, mode=Mode.PRIVATE)
    fillet1_piece_6 = split(fillet1_piece_6, bisect_by=Plane(origin=(-4.620408244, -15.128632193, 0.701712982), z_dir=(0, 0, -1)), keep=Keep.TOP, mode=Mode.PRIVATE)
    fillet1_piece_6 = split(fillet1_piece_6, bisect_by=Plane(origin=(-4.620408244, -15.128632193, 0.208426284), z_dir=(0, 0, 1)), keep=Keep.TOP, mode=Mode.PRIVATE)
    add(fillet1_piece_6)

    # Sketch9 → Cut-Extrude7 (cut, two sides: drawn at the far end of the back side and taken through both)
    with BuildSketch(Plane.XY.offset(0.701712982).offset(-CUT_EXTRUDE7_DEPTH_BACK)):
        with Locations((0, -25.5)):
            Rectangle(SKETCH9_W, SKETCH9_H)
    extrude(amount=CUT_EXTRUDE7_DEPTH + CUT_EXTRUDE7_DEPTH_BACK, mode=Mode.SUBTRACT)

    # Sketch12 → Boss-Extrude5 (add, along a direction that is not the sketch's normal)
    with BuildSketch(Plane.XZ.offset(18)):
        with Locations((5.31, 0.455069633)):
            Rectangle(SKETCH12_W, SKETCH12_H)
        with Locations((0, 0.455069633)):
            Rectangle(SKETCH12_W, SKETCH12_H)
        with Locations((-5.31, 0.455069633)):
            Rectangle(SKETCH12_W, SKETCH12_H)
    extrude(amount=BOSS_EXTRUDE5_DEPTH, dir=(0, -0.984807753012208, 0.17364817766693055))


solid = part_2.part
